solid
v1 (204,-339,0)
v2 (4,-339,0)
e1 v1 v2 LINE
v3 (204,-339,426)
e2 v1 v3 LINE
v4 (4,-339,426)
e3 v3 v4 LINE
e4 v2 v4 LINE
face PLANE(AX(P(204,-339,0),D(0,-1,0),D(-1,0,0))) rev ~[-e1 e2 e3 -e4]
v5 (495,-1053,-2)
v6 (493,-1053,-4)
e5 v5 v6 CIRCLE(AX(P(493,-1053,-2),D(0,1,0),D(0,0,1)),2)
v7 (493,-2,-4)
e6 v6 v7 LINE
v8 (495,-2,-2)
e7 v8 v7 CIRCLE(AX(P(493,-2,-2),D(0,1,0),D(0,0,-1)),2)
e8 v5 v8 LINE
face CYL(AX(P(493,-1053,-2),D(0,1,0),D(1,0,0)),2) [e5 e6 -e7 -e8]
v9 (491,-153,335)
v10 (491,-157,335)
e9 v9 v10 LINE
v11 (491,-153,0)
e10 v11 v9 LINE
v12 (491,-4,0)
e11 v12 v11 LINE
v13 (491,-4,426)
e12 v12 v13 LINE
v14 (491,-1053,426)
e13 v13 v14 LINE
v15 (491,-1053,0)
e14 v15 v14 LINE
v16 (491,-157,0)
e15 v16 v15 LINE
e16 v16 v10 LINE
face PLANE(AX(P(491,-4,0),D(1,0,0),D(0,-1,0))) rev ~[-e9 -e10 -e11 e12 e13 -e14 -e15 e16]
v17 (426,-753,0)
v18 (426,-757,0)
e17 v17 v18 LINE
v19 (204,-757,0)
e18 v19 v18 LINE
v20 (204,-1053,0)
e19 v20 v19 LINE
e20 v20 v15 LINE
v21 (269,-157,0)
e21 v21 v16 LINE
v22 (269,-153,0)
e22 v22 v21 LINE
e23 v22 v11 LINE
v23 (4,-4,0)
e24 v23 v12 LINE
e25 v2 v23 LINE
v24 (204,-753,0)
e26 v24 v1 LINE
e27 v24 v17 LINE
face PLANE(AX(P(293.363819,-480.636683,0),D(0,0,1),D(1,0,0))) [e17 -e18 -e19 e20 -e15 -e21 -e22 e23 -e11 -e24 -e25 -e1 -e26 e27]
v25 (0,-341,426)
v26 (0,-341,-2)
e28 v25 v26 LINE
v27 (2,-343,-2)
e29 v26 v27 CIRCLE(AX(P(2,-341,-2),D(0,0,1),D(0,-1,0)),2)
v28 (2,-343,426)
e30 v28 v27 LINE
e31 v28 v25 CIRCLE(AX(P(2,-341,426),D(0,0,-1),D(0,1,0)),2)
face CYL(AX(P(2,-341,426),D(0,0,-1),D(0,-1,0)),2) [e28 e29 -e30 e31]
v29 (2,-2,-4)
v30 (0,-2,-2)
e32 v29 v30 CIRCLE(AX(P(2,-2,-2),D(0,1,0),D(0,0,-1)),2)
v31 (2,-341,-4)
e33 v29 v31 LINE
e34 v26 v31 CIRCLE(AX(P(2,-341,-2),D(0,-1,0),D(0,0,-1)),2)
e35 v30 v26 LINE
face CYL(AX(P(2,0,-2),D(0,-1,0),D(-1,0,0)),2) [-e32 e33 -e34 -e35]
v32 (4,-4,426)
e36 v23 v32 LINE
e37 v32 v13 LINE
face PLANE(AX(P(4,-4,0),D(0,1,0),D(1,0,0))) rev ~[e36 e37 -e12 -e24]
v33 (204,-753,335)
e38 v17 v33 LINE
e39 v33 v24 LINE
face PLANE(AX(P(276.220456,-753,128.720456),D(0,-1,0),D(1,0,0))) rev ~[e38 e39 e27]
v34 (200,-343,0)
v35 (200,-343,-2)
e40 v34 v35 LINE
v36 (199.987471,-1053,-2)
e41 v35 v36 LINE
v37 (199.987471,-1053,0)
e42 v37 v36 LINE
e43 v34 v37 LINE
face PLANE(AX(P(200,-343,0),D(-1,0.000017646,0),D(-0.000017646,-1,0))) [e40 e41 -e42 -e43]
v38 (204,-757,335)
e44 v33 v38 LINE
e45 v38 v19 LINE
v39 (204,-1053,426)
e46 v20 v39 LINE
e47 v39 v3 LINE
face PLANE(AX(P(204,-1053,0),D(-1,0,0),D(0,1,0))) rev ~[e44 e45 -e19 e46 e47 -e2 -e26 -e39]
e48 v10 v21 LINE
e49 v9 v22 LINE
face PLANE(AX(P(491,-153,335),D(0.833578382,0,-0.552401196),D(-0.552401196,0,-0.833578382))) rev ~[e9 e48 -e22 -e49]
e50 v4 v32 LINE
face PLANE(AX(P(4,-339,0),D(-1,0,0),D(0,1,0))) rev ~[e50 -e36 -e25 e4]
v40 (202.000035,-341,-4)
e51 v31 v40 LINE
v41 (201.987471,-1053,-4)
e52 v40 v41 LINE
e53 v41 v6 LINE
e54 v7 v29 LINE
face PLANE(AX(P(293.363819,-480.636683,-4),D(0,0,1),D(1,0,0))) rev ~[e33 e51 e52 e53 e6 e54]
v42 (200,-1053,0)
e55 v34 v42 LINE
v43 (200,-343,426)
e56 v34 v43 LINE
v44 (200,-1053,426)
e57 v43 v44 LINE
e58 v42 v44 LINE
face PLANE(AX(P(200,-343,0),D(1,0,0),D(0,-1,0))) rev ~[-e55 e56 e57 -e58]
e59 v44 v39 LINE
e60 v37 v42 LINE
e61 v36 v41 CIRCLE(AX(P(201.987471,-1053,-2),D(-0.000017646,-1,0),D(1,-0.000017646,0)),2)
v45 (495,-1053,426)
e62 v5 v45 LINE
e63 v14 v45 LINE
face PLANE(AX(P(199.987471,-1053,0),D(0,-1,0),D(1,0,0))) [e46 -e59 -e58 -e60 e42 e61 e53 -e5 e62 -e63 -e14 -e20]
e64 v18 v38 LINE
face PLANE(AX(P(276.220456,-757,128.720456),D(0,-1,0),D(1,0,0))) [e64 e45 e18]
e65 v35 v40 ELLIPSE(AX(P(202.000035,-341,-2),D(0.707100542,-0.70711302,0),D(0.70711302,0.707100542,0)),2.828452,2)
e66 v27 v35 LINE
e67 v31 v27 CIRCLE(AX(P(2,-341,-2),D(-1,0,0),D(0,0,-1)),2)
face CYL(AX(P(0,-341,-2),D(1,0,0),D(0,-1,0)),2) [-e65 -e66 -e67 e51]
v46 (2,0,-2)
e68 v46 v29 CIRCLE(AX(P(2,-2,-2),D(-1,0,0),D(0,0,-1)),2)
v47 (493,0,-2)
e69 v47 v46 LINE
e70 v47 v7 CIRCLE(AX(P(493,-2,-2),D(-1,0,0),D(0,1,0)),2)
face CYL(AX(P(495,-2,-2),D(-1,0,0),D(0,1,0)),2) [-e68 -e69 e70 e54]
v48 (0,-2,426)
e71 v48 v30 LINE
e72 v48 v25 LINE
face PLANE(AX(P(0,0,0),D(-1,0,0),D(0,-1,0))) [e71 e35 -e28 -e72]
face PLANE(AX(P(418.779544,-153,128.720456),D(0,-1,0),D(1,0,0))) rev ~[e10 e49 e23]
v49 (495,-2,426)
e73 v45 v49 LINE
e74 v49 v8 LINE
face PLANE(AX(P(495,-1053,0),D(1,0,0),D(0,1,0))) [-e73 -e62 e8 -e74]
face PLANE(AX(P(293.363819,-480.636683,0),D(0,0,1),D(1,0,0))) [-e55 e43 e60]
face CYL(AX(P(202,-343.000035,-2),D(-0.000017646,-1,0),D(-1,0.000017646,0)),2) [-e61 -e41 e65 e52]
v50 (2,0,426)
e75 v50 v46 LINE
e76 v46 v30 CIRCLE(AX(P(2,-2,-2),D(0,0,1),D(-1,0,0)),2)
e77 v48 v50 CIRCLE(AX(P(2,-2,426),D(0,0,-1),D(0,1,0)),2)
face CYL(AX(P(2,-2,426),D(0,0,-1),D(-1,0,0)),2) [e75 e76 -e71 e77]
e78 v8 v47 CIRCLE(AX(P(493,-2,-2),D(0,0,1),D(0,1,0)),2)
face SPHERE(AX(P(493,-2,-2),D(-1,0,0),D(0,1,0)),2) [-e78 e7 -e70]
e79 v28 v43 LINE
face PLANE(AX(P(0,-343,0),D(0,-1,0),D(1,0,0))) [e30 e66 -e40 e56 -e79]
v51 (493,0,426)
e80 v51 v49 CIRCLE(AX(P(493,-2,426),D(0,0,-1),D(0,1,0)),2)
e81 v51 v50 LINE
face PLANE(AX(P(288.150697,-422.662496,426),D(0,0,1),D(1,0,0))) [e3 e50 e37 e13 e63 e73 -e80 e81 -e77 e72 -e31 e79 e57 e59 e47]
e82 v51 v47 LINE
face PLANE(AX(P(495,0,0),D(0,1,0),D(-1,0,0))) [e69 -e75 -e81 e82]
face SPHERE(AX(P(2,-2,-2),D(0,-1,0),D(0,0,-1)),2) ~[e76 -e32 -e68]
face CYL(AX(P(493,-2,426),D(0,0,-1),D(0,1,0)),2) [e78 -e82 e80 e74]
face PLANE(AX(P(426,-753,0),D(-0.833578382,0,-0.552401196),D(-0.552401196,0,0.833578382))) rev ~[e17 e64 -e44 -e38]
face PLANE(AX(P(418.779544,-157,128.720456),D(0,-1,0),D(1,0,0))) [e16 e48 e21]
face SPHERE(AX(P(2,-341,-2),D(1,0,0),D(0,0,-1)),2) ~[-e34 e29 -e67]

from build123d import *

# Parameters (mm, degrees)
F1_DEPTH  = 426
F3_DEPTH  = 4
F4_R      = 2
F7_DEPTH  = 4
F8_DEPTH  = 4
F11_DEPTH = 4


# Not quite as in the source:
# - a feature names something its author has since deleted; it is built from what else it names


with BuildPart() as f1:
    # F0 (on Top) → F1 (new body)
    with BuildSketch(Plane.XY):
        Polygon((495, 0), (0, 0), (0, -343), (200, -343), (200, -1053), (204, -1053), (204, -339), (4, -339), (4, -4), (491, -4), (491, -1053), (495, -1053), align=None)
    extrude(amount=F1_DEPTH)

    # F2 (on Top) → F3 (join)
    with BuildSketch(Plane.XY):
        Polygon((0, -343), (200, -343), (199.9874711037, -1053), (495, -1053), (495, 0), (0, 0), align=None)
    extrude(amount=-F3_DEPTH)

    # F4
    f4_edges = [f1.edges().sort_by_distance(p)[0] for p in [
        (100, -343, -4),
        (0, -171.5, -4),
        (247.5, 0, -4),
        (0, -343, 211),
        (0, 0, 211),
        (495, 0, 211),
        (199.993736, -698, -4),
        (495, -526.5, -4),
    ]]
    fillet(f4_edges, radius=F4_R)

    # F6 (on offset) → F7 (join)
    with BuildSketch(Plane.XZ.offset(753)):
        Polygon((426, 0), (204, 335), (204, 0), align=None)
    extrude(amount=F7_DEPTH)

    # F6 (on offset) → F8 (join)
    with BuildSketch(Plane.XZ.offset(753)):
        Polygon((426, 0), (204, 335), (204, 0), align=None)
    extrude(amount=F8_DEPTH)

    # F10 (on offset) → F11 (join)
    with BuildSketch(Plane.XZ.offset(153)):
        Polygon((491, 335), (269, 0), (491, 0), align=None)
    extrude(amount=F11_DEPTH)


solid = f1.part
